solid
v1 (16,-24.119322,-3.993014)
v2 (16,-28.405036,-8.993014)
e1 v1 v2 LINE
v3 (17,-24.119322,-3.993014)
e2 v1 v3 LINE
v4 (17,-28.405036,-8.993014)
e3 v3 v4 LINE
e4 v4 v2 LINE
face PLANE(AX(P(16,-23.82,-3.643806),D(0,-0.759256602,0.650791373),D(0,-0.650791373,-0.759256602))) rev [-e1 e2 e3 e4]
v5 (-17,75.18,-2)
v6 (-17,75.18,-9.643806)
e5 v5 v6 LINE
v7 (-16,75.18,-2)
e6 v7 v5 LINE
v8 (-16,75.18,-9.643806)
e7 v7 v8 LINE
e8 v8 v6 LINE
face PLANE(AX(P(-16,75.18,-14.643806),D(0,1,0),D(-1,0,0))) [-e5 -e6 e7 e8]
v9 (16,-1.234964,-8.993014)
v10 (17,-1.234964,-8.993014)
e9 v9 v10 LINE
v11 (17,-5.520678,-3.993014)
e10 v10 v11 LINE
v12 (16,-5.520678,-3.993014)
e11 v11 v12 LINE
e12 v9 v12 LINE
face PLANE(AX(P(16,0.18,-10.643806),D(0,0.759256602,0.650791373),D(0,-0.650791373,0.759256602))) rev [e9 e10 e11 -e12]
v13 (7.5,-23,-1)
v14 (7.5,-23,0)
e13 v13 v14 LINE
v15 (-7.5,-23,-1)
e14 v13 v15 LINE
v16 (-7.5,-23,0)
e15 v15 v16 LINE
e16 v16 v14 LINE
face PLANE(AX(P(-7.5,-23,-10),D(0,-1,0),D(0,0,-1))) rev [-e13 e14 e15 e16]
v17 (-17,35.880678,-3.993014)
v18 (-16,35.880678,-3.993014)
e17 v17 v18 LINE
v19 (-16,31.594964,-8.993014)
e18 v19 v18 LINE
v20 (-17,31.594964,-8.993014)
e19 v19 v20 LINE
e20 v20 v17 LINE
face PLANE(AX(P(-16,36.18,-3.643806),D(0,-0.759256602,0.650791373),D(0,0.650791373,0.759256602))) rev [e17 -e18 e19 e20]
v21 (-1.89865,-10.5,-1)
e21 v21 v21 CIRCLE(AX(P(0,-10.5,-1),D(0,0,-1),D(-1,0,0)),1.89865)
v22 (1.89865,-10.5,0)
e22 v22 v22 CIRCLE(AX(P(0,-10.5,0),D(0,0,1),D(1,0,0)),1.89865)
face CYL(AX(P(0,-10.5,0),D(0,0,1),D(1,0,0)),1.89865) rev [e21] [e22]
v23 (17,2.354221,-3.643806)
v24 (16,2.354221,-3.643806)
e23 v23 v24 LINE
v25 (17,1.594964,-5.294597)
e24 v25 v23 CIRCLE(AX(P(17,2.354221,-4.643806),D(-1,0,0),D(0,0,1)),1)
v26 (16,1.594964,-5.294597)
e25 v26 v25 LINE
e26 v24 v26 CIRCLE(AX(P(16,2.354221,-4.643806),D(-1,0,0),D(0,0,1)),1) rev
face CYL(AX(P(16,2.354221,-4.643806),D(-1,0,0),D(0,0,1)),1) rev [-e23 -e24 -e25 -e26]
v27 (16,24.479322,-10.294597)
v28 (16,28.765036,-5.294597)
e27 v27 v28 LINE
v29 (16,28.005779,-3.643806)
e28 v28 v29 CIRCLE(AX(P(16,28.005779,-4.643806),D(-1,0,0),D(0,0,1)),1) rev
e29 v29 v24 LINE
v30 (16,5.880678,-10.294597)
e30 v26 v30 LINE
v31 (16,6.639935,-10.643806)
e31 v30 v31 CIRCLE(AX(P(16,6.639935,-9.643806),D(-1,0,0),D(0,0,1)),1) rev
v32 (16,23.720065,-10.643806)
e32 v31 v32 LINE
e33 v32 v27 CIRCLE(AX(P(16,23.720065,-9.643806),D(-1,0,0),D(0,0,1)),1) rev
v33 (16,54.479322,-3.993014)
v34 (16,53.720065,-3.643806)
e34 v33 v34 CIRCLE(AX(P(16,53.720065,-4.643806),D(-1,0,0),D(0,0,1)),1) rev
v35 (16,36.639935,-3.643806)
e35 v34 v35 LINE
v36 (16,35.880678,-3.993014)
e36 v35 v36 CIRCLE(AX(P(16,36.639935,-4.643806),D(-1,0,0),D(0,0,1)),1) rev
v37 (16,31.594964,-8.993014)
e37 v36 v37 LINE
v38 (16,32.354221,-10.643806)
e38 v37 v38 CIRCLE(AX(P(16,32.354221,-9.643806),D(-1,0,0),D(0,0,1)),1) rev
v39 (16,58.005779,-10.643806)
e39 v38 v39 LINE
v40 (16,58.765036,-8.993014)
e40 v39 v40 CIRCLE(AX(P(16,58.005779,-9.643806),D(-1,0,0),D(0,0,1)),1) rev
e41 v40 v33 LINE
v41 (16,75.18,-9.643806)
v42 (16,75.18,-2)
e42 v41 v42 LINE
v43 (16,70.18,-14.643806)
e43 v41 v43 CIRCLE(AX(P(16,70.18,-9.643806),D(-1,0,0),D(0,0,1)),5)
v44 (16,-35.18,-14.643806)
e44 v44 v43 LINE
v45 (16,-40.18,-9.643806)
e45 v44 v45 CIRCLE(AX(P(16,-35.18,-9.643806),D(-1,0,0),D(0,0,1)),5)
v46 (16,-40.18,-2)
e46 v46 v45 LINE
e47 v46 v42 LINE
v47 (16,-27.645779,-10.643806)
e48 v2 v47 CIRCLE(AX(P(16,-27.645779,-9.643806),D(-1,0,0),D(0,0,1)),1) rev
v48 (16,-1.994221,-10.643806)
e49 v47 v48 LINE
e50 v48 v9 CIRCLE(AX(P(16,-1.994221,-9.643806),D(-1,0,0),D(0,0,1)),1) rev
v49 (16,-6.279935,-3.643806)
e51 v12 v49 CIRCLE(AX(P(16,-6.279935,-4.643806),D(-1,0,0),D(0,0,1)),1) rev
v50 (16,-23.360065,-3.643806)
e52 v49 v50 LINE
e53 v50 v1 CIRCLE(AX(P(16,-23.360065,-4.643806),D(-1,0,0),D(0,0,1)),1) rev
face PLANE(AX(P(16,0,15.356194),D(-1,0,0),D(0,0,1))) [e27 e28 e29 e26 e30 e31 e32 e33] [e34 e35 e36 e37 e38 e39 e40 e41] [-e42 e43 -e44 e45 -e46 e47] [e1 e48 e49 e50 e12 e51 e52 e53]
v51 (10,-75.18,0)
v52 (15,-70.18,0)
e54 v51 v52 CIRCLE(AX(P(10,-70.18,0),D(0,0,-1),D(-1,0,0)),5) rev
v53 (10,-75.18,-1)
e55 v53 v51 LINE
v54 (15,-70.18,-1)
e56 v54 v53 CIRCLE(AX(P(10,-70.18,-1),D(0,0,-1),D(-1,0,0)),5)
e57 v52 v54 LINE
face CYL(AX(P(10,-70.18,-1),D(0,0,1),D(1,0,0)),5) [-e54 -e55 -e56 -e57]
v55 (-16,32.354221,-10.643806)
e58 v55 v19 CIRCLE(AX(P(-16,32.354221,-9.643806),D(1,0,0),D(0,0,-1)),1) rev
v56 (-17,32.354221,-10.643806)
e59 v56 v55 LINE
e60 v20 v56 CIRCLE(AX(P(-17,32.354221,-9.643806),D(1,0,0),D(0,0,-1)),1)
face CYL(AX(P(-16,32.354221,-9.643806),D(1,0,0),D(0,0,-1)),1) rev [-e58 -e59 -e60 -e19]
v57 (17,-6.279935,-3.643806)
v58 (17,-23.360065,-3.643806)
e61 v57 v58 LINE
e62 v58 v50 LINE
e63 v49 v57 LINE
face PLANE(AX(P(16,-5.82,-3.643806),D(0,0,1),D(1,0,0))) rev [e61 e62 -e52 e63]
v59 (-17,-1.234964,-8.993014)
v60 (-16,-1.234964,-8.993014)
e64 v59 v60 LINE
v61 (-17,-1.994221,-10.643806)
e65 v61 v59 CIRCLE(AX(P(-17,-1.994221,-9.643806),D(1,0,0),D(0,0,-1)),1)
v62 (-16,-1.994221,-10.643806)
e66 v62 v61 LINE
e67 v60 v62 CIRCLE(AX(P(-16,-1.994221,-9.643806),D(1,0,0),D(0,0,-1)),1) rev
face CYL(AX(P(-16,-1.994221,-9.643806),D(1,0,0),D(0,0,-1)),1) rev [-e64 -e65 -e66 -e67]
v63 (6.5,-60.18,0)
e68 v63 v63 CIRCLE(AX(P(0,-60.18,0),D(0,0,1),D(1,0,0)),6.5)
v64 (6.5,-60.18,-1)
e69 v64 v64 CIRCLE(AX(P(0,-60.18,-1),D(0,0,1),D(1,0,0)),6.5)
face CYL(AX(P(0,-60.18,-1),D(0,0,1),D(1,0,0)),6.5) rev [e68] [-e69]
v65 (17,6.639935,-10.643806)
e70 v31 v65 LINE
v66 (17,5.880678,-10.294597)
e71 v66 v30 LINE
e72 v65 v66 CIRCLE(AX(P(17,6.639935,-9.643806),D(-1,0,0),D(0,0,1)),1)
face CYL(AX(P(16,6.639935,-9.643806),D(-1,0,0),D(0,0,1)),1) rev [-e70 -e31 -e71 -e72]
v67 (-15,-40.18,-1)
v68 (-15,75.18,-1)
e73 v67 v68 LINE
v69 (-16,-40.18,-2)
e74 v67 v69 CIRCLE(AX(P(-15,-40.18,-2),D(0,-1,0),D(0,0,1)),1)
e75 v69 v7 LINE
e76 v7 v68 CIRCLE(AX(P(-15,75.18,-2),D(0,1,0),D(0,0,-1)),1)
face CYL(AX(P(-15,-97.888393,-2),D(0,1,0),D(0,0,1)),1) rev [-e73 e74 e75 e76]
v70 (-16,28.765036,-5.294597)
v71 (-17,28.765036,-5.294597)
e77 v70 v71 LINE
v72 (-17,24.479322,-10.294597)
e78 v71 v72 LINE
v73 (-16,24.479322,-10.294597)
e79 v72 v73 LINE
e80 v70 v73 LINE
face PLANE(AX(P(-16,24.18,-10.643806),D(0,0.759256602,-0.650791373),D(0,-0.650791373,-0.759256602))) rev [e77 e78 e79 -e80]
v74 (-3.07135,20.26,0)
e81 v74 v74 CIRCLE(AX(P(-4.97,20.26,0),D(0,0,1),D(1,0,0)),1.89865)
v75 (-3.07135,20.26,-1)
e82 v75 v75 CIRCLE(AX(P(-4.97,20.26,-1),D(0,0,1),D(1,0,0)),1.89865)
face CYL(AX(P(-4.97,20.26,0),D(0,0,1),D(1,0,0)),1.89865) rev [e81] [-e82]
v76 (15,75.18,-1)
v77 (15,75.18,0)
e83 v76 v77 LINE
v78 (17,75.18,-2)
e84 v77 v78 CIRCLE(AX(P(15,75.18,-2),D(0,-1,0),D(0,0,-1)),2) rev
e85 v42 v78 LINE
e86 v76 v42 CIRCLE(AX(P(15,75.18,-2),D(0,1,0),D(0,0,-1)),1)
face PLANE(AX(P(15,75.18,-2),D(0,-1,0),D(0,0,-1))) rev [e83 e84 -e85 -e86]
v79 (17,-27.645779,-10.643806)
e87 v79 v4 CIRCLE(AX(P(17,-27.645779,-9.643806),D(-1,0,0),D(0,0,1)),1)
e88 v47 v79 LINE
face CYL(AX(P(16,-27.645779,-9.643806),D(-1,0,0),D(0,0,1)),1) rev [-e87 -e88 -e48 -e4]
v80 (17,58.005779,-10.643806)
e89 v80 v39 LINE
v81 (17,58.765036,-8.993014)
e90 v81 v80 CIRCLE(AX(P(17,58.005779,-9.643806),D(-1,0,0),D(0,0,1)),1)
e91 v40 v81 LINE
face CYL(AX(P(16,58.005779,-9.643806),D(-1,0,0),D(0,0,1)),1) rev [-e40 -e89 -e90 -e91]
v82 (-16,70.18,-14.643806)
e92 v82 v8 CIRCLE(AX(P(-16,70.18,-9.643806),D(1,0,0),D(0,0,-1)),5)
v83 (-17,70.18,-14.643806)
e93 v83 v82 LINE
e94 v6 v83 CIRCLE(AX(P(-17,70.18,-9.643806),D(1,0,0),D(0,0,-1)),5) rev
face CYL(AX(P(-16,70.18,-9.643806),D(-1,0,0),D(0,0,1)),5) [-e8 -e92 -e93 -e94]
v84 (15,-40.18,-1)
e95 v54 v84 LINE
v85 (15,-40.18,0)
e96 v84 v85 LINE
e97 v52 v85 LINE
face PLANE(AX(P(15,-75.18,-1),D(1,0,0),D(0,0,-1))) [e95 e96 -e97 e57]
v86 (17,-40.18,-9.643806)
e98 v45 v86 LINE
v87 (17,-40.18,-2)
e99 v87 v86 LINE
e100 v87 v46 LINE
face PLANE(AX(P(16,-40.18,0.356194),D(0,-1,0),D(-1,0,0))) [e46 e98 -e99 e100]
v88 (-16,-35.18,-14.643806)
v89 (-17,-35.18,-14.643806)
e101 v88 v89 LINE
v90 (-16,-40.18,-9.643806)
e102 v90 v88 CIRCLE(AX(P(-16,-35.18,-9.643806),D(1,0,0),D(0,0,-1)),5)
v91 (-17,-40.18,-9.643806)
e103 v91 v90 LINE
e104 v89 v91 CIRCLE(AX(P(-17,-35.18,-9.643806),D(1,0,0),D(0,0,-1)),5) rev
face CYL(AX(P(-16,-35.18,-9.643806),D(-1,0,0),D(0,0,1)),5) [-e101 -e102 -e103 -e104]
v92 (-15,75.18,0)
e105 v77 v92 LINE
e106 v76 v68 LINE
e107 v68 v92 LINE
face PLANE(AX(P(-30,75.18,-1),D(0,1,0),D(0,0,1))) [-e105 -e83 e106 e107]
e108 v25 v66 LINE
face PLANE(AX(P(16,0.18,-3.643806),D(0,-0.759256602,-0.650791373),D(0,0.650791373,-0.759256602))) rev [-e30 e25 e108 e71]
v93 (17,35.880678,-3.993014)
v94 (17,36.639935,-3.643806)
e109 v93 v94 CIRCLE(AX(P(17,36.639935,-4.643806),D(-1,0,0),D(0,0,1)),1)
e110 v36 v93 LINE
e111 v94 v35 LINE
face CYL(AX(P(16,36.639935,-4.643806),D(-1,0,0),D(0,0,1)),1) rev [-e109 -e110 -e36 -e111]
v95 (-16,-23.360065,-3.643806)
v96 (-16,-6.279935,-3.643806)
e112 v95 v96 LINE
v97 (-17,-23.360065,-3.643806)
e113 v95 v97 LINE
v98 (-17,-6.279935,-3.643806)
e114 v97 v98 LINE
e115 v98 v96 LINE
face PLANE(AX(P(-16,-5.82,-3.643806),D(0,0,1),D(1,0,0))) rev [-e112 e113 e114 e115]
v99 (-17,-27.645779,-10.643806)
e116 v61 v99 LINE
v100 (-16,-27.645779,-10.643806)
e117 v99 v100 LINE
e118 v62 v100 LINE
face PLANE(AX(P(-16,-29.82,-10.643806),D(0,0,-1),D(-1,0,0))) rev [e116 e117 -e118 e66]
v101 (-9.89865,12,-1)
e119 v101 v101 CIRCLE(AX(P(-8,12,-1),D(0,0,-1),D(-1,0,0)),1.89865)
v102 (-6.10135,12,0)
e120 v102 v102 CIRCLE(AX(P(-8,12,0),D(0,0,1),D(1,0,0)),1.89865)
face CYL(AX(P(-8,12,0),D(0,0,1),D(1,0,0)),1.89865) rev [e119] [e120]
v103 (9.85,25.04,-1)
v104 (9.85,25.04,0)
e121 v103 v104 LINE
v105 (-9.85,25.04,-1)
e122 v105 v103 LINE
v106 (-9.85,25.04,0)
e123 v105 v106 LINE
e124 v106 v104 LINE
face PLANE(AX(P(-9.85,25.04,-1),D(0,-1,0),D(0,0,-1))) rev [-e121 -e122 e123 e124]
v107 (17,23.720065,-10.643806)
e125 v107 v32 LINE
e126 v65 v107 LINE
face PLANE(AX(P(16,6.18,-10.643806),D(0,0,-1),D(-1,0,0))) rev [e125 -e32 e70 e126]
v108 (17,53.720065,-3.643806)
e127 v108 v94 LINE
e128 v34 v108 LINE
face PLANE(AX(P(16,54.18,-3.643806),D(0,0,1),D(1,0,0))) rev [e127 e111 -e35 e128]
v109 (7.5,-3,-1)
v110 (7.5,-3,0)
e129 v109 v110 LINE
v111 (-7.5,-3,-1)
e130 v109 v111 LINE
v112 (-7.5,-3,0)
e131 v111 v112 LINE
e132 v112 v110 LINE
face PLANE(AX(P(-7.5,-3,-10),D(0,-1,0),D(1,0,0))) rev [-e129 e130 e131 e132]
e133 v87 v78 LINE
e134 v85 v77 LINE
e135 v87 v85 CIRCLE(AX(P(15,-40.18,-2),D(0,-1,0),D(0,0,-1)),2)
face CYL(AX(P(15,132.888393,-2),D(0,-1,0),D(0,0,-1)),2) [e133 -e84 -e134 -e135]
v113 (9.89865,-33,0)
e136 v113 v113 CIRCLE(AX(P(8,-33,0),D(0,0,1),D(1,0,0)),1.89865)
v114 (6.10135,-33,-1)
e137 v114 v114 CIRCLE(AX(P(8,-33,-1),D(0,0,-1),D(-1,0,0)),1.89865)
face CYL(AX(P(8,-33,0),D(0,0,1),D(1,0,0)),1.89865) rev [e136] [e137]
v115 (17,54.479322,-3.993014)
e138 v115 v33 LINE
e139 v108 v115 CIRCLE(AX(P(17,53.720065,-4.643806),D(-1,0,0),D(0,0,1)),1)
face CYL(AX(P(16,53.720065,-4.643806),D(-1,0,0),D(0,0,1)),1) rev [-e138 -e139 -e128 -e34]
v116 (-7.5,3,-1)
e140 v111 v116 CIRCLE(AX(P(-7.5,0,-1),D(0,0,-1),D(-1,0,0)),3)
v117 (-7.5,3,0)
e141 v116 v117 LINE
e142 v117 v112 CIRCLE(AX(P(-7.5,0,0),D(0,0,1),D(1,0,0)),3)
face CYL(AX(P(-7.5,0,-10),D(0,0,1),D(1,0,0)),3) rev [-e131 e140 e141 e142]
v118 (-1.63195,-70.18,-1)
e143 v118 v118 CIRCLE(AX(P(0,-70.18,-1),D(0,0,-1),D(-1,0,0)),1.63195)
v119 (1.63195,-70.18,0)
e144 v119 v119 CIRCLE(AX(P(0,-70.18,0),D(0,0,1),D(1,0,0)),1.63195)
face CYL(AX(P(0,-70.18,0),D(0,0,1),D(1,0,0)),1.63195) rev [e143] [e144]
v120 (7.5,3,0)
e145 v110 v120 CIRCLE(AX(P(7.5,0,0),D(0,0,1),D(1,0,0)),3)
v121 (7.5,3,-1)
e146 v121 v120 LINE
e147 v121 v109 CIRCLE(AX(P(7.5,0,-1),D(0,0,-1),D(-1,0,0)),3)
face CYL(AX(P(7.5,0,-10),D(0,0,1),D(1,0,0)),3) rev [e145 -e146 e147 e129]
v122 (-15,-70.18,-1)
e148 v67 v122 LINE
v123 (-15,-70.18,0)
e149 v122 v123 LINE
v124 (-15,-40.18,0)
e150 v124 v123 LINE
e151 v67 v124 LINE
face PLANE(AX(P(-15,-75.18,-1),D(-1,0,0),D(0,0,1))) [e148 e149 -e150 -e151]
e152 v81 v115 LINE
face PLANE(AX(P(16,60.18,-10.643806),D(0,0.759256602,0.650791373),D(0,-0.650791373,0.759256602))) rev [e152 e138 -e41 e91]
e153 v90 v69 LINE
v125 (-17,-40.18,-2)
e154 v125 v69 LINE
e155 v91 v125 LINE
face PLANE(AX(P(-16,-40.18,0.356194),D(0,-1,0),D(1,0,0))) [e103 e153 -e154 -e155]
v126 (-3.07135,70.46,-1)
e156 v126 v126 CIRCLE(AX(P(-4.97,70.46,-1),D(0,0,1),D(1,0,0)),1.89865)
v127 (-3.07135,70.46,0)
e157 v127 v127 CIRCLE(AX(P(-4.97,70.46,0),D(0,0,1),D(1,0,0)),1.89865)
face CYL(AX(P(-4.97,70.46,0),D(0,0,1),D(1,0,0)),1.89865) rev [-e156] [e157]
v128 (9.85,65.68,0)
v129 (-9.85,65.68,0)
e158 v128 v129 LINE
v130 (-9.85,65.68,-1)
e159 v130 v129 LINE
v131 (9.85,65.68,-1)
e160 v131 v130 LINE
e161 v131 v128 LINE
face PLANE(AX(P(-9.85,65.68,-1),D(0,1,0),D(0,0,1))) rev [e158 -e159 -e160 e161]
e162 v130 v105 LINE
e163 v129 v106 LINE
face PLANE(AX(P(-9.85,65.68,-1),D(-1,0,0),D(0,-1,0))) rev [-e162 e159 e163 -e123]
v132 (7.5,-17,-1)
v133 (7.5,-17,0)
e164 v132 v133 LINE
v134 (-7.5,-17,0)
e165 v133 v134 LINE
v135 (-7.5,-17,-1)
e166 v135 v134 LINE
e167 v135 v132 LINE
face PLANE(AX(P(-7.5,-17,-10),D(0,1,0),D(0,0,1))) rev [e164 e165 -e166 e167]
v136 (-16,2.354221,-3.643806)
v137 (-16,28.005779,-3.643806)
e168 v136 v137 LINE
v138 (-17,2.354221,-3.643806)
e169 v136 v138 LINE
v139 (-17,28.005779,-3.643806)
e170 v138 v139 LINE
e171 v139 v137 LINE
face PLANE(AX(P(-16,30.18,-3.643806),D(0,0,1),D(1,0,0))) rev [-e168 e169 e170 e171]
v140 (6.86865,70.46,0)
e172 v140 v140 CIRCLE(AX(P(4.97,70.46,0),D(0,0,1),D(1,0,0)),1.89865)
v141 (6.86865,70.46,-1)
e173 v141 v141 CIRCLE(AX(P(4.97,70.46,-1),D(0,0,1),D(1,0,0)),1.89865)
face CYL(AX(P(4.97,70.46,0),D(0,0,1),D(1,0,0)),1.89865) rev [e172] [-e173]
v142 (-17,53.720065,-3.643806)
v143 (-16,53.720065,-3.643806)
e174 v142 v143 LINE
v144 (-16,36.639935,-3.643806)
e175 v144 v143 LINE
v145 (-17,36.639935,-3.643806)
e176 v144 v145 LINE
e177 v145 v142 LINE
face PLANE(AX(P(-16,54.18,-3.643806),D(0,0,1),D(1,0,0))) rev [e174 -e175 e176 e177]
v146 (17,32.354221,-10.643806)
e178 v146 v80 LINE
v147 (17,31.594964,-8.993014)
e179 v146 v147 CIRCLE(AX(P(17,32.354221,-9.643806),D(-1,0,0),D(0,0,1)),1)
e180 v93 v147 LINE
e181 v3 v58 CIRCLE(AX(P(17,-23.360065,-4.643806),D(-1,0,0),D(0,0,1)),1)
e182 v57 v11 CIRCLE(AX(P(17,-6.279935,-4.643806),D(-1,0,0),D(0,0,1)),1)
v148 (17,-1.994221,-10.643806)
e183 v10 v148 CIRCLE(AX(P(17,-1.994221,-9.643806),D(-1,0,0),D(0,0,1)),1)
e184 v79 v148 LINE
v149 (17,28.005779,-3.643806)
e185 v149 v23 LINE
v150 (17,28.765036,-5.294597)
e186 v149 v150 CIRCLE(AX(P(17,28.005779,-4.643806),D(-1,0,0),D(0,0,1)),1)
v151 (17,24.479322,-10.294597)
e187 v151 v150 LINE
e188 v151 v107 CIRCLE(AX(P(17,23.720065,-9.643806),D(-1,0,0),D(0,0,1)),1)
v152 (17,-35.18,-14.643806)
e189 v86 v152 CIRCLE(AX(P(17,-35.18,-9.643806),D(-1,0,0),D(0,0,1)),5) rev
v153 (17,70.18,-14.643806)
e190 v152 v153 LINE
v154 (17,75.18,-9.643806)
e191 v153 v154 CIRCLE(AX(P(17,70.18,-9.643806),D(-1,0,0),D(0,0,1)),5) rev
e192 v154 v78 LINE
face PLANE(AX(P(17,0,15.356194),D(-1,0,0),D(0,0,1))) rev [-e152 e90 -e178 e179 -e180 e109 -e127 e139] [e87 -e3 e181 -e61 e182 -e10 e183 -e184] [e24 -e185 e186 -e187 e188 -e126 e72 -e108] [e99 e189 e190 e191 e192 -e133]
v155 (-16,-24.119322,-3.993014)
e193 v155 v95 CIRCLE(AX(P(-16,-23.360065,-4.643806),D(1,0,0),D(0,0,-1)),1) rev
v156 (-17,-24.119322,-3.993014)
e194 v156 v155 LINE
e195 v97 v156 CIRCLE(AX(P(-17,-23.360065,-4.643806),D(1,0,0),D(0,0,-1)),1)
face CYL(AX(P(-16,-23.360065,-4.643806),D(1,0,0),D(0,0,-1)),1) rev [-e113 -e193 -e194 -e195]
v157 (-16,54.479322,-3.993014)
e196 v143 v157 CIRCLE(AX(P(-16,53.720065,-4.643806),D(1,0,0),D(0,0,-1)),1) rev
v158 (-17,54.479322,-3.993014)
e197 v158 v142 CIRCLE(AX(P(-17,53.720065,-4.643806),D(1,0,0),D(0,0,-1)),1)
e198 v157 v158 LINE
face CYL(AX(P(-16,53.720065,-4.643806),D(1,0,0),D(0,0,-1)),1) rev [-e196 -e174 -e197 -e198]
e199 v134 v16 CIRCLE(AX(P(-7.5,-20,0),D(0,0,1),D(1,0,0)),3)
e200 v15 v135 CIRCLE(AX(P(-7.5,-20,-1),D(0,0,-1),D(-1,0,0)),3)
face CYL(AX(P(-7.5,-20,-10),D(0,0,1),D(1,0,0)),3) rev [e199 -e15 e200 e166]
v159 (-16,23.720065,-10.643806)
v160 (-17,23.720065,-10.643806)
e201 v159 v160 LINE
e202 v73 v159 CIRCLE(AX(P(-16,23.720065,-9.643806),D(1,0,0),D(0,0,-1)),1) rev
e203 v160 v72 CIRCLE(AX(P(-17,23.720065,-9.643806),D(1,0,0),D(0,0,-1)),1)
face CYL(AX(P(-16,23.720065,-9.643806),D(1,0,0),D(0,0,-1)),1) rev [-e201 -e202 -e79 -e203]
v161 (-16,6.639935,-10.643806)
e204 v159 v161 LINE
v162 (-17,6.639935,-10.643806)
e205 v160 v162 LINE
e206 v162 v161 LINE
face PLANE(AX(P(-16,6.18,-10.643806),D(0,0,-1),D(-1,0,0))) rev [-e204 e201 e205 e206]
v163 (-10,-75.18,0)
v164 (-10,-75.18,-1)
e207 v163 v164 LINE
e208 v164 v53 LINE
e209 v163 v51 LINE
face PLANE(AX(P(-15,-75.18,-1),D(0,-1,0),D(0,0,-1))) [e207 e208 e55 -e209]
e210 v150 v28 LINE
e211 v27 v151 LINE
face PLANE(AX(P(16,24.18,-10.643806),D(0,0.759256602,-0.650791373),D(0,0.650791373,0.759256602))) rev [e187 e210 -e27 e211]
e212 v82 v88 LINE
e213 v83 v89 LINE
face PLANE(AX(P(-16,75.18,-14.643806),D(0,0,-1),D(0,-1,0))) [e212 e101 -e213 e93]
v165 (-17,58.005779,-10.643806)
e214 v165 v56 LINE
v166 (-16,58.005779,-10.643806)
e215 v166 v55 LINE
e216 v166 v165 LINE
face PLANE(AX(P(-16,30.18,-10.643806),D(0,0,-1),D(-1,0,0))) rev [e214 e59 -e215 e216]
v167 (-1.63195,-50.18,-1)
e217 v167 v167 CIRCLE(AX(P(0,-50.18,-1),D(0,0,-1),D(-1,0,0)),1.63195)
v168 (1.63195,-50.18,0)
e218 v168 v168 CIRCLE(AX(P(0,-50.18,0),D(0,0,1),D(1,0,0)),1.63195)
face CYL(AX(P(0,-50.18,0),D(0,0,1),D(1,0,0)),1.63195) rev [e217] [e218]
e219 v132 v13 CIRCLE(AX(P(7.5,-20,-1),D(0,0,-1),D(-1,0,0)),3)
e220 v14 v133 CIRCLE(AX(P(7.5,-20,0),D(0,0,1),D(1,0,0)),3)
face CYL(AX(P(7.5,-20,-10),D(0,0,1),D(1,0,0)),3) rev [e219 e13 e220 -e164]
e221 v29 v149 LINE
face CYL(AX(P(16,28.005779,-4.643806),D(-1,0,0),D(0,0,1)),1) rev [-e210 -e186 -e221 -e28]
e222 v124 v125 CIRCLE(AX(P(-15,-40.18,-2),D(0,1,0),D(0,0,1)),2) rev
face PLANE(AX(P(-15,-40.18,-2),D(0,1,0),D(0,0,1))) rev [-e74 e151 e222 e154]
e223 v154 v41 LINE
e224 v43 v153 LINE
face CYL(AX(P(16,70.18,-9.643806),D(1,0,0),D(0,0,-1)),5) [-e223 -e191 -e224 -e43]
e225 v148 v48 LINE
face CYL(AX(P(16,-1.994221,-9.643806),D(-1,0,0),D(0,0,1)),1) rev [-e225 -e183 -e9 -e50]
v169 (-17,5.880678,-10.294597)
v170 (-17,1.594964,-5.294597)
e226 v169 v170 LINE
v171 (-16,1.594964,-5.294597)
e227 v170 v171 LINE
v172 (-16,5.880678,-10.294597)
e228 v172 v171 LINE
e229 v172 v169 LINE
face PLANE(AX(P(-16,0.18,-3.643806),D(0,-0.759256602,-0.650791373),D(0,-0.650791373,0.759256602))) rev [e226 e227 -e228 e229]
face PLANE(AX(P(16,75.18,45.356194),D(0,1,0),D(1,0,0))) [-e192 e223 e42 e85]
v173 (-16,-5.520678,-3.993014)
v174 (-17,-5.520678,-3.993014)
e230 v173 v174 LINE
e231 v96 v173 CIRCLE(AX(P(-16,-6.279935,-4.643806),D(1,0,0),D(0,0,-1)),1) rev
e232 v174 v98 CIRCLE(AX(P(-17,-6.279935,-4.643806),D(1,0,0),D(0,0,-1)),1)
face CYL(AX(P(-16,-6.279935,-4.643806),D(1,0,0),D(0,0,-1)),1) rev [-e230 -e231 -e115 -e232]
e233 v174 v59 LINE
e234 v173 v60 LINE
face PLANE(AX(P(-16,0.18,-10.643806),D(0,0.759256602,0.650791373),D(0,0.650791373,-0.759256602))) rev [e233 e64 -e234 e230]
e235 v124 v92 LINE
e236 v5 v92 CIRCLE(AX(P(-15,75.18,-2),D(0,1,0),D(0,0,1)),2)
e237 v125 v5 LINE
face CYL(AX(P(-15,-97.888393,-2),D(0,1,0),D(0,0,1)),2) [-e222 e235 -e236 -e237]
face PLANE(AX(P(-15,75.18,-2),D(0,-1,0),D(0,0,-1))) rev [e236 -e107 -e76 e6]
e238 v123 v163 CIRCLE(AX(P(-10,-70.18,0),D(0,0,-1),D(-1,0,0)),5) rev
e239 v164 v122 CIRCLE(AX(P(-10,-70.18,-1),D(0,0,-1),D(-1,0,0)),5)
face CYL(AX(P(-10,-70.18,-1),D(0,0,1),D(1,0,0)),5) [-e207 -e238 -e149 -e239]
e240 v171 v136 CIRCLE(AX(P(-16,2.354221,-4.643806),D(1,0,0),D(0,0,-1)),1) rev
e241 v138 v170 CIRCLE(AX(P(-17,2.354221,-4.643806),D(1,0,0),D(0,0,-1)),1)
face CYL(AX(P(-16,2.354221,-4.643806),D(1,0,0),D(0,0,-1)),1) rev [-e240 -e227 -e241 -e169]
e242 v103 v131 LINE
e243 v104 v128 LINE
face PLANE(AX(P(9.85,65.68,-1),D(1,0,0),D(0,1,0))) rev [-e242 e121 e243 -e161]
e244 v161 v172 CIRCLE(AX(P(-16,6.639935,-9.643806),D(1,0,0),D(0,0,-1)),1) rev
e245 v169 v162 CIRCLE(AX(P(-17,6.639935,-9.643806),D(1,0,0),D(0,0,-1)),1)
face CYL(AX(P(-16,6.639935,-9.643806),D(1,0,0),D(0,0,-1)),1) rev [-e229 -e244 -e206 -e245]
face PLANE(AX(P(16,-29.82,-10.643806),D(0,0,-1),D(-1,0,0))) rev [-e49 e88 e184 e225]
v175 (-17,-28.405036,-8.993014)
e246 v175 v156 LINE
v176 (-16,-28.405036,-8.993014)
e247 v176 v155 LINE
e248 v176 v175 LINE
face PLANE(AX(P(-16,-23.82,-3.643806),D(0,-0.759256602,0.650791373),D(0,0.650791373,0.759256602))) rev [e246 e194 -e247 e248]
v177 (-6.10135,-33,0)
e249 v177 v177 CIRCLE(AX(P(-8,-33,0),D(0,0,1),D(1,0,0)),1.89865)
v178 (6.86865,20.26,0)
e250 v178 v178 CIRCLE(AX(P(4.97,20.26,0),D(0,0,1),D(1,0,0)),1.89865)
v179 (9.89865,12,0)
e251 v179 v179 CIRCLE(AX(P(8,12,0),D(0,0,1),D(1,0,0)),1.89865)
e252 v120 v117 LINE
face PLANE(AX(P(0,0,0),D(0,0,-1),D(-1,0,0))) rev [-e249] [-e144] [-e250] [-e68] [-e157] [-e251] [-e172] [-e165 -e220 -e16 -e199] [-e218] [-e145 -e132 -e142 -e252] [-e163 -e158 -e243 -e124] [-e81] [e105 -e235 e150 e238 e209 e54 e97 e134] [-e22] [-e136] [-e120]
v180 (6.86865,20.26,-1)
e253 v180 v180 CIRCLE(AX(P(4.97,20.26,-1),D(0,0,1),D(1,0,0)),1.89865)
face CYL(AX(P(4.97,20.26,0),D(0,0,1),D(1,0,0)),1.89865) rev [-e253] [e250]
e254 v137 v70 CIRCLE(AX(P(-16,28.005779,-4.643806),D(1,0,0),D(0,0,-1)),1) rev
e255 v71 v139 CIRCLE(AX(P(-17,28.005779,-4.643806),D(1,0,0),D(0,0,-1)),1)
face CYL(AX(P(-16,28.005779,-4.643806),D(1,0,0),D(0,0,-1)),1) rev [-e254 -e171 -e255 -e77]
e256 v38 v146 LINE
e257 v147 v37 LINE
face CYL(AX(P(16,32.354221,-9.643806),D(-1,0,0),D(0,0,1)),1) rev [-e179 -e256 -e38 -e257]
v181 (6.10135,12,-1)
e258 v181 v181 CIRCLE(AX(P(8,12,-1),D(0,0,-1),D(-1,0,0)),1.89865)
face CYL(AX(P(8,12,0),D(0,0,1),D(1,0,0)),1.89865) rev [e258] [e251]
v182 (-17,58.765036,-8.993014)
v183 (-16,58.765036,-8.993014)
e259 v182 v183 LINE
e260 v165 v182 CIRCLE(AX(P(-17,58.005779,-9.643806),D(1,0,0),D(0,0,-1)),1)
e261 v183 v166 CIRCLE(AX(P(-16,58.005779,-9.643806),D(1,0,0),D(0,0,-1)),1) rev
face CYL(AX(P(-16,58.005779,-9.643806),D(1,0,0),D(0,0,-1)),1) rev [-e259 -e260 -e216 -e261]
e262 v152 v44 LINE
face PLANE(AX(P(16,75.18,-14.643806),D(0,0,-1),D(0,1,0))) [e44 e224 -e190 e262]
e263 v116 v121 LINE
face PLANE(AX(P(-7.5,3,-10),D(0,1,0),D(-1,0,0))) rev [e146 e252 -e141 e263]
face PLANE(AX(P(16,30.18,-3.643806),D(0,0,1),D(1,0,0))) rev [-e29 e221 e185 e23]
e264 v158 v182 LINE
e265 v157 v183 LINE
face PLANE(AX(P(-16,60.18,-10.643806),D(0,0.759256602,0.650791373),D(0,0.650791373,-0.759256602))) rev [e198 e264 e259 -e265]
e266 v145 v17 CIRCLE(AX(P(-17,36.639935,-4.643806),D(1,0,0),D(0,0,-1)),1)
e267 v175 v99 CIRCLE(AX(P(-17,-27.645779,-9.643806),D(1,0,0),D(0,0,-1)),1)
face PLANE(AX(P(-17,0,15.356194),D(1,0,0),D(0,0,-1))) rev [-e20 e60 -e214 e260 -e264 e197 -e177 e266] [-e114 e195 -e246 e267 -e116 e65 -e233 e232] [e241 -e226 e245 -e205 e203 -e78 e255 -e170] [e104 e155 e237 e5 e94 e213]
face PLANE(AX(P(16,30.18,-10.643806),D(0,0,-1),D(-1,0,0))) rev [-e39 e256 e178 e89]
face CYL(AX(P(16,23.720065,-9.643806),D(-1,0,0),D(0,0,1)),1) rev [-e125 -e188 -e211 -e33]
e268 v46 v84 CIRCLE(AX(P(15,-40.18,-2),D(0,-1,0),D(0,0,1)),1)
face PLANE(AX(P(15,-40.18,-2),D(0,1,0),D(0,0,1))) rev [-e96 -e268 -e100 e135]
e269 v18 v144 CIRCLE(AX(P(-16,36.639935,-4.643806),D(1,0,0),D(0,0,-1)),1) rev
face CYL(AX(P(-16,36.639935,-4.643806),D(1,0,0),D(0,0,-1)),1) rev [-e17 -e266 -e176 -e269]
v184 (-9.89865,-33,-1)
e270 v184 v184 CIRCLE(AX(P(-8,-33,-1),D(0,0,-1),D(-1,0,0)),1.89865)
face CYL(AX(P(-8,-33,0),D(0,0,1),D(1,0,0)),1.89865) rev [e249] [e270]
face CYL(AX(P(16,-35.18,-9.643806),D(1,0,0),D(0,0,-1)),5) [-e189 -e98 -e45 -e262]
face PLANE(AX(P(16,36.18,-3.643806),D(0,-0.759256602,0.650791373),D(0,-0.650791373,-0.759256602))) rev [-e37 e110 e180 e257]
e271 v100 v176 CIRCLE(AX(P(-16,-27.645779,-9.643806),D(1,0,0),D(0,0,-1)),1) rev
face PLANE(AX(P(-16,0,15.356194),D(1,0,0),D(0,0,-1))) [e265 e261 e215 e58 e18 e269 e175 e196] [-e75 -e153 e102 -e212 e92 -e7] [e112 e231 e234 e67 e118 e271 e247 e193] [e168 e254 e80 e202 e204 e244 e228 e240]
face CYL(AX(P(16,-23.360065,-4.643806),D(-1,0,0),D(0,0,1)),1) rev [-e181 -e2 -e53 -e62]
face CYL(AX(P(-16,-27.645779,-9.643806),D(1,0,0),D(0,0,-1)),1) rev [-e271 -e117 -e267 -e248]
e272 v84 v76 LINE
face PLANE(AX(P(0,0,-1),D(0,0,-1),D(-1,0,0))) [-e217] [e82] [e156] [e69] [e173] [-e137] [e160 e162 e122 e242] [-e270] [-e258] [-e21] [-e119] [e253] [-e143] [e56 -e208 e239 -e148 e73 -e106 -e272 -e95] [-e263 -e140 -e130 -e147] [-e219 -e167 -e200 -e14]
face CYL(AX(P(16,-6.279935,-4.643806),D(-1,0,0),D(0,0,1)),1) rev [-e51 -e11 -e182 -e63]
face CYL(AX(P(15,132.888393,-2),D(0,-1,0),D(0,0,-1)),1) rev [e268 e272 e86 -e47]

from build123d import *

# Parameters (mm, degrees)
SKETCH1_R                  = 6.5
SKETCH1_W                  = 19.7
SKETCH1_H                  = 40.64
BASE_FLANGE1_DEPTH         = 1
FILLET1_R                  = 5
F_6_CLEARANCE_HOLE1_D      = 3.7973
SKETCHED_START             = 16.78876
SKETCHED_BEND1_OUTLINE_W   = 115.36
SKETCHED_BEND1_OUTLINE_H   = 1
SKETCHED_BEND1_DEPTH       = 13.21124
SKETCHED_START_2           = -30
SKETCHED_BEND1_2_OUTLINE_W = 115.36
SKETCHED_BEND1_2_OUTLINE_H = 1
SKETCHED_BEND1_2_DEPTH     = 13.18876
SKETCHED_START_3           = -17
SKETCHED_BEND1_3_DEPTH     = 2
SKETCHED_START_4           = 15
SKETCHED_BEND1_4_DEPTH     = 2
SKETCHED_START_5           = -40.18
SKETCHED_BEND1_5_DEPTH     = 115.36
F_4_CLEARANCE_HOLE1_D      = 3.2639
FILLET2_R                  = 1
F_6_CLEARANCE_HOLE2_D      = 3.7973
CUT_EXTRUDE1_DEPTH         = 10


with BuildPart() as part:
    # Base-Flange1: sheet metal written as solids
    # Sketch1 → Base-Flange1 (new body)
    with BuildSketch(Plane.XY):
        Polygon((-30, 75.18), (30, 75.18), (30, -40.18), (15, -40.18), (15, -75.18), (-15, -75.18), (-15, -40.18), (-30, -40.18), align=None)
        with Locations((0, -60.18)):
            Circle(SKETCH1_R, mode=Mode.SUBTRACT)
        Polygon((-26, 60.18), (-19, 54.18), (-19, 36.18), (-26, 30.18), align=None, mode=Mode.SUBTRACT)
        with Locations((0, 45.36)):
            Rectangle(SKETCH1_W, SKETCH1_H, mode=Mode.SUBTRACT)
        Polygon((-26, 24.18), (-19, 30.18), (-19, 0.18), (-26, 6.18), align=None, mode=Mode.SUBTRACT)
        Polygon((-26, -29.82), (-26, 0.18), (-19, -5.82), (-19, -23.82), align=None, mode=Mode.SUBTRACT)
        Polygon((19, -23.82), (26, -29.82), (26, 0.18), (19, -5.82), align=None, mode=Mode.SUBTRACT)
        Polygon((19, 0.18), (26, 6.18), (26, 24.18), (19, 30.18), align=None, mode=Mode.SUBTRACT)
        Polygon((19, 36.18), (26, 30.18), (26, 60.18), (19, 54.18), align=None, mode=Mode.SUBTRACT)
    extrude(amount=-BASE_FLANGE1_DEPTH)

    # Fillet1
    fillet1_edges = [part.edges().sort_by_distance(p)[0] for p in [
        (-30, 75.18, -0.5),
        (30, 75.18, -0.5),
        (30, -40.18, -0.5),
        (15, -75.18, -0.5),
        (-15, -75.18, -0.5),
        (-30, -40.18, -0.5),
    ]]
    fillet(fillet1_edges, radius=FILLET1_R)

    # #6 Clearance Hole1 (through all)
    with Locations(Plane.XY):
        with Locations((-4.97, 70.46), (4.97, 70.46), (-4.97, 20.26), (4.97, 20.26)):
            Hole(F_6_CLEARANCE_HOLE1_D / 2)

    # Sketched Bend1: read off the stored shape, not the designer's step
    # Sketched Bend1 outline → Sketched Bend1 (cut)
    with BuildSketch(Plane.YZ.offset(SKETCHED_START)):
        with Locations((17.5, -0.5)):
            Rectangle(SKETCHED_BEND1_OUTLINE_W, SKETCHED_BEND1_OUTLINE_H)
    extrude(amount=SKETCHED_BEND1_DEPTH, mode=Mode.SUBTRACT)

    # Sketched Bend1 2 outline → Sketched Bend1 2 (cut)
    with BuildSketch(Plane.YZ.offset(SKETCHED_START_2)):
        with Locations((17.5, -0.5)):
            Rectangle(SKETCHED_BEND1_2_OUTLINE_W, SKETCHED_BEND1_2_OUTLINE_H)
    extrude(amount=SKETCHED_BEND1_2_DEPTH, mode=Mode.SUBTRACT)

    # Sketched Bend1 3 outline → Sketched Bend1 3 (add)
    with BuildSketch(Plane.YZ.offset(SKETCHED_START_3)):
        with BuildLine():
            Line((75.18, -9.64380551), (75.18, -1))
            Line((75.18, -1), (-40.18, -1))
            Line((-40.18, -1), (-40.18, -9.64380551))
            ThreePointArc((-40.18, -9.64380551), (-38.715533906, -13.179339416), (-35.18, -14.64380551))
            Line((-35.18, -14.64380551), (70.18, -14.64380551))
            ThreePointArc((70.18, -14.64380551), (73.715533906, -13.179339416), (75.18, -9.64380551))
        make_face()
        Polygon((-23.82, -3.64380551), (-5.82, -3.64380551), (0.18, -10.64380551), (-29.82, -10.64380551), align=None, mode=Mode.SUBTRACT)
        Polygon((0.18, -3.64380551), (30.18, -3.64380551), (24.18, -10.64380551), (6.18, -10.64380551), align=None, mode=Mode.SUBTRACT)
        Polygon((54.18, -3.64380551), (60.18, -10.64380551), (30.18, -10.64380551), (36.18, -3.64380551), align=None, mode=Mode.SUBTRACT)
    extrude(amount=SKETCHED_BEND1_3_DEPTH)

    # Sketched Bend1 4 outline → Sketched Bend1 4 (add)
    with BuildSketch(Plane.YZ.offset(SKETCHED_START_4)):
        with BuildLine():
            Line((75.18, -9.64380551), (75.18, -1))
            Line((75.18, -1), (-40.18, -1))
            Line((-40.18, -1), (-40.18, -9.64380551))
            ThreePointArc((-40.18, -9.64380551), (-38.715533906, -13.179339416), (-35.18, -14.64380551))
            Line((-35.18, -14.64380551), (70.18, -14.64380551))
            ThreePointArc((70.18, -14.64380551), (73.715533906, -13.179339416), (75.18, -9.64380551))
        make_face()
        Polygon((-23.82, -3.64380551), (-5.82, -3.64380551), (0.18, -10.64380551), (-29.82, -10.64380551), align=None, mode=Mode.SUBTRACT)
        Polygon((0.18, -3.64380551), (30.18, -3.64380551), (24.18, -10.64380551), (6.18, -10.64380551), align=None, mode=Mode.SUBTRACT)
        Polygon((54.18, -3.64380551), (60.18, -10.64380551), (30.18, -10.64380551), (36.18, -3.64380551), align=None, mode=Mode.SUBTRACT)
    extrude(amount=SKETCHED_BEND1_4_DEPTH)

    # Sketched Bend1 5 outline → Sketched Bend1 5 (cut)
    with BuildSketch(Plane(origin=(0, 0, 0), x_dir=(1, 0, 0), z_dir=(0, 1, 0)).offset(SKETCHED_START_5)):
        with BuildLine():
            ThreePointArc((-16, 2), (-15.707106781, 1.292893219), (-15, 1))
            Line((-15, 1), (-15, 14.64380551))
            Line((-15, 14.64380551), (-16, 14.64380551))
            Line((-16, 14.64380551), (-16, 2))
        make_face()
        with BuildLine():
            ThreePointArc((17, 2), (16.414213562, 0.585786438), (15, 0))
            Line((15, 0), (16.78876, 0))
            Line((16.78876, 0), (16.78876, 1))
            Line((16.78876, 1), (17, 1))
            Line((17, 1), (17, 2))
        make_face()
        with BuildLine():
            ThreePointArc((-15, 0), (-16.414213562, 0.585786438), (-17, 2))
            Line((-17, 2), (-17, 1))
            Line((-17, 1), (-16.81124, 1))
            Line((-16.81124, 1), (-16.81124, 0))
            Line((-16.81124, 0), (-15, 0))
        make_face()
        with BuildLine():
            ThreePointArc((15, 1), (15.707106781, 1.292893219), (16, 2))
            Line((16, 2), (16, 14.64380551))
            Line((16, 14.64380551), (15, 14.64380551))
            Line((15, 14.64380551), (15, 1))
        make_face()
    extrude(amount=SKETCHED_BEND1_5_DEPTH, mode=Mode.SUBTRACT)

    # #4 Clearance Hole1 (through all)
    with Locations(Plane.XY):
        with Locations((0, -50.18), (0, -70.18)):
            Hole(F_4_CLEARANCE_HOLE1_D / 2)

    # Fillet2
    fillet2_edges = [part.edges().sort_by_distance(p)[0] for p in [
        (-16.5, 54.18, -3.64380551),
        (-16.5, 36.18, -3.64380551),
        (-16.5, 30.18, -10.64380551),
        (-16.5, 60.18, -10.64380551),
        (-16.5, 24.18, -10.64380551),
        (-16.5, 30.18, -3.64380551),
        (-16.5, 0.18, -3.64380551),
        (-16.5, 6.18, -10.64380551),
        (-16.5, -23.82, -3.64380551),
        (-16.5, -29.82, -10.64380551),
        (-16.5, 0.18, -10.64380551),
        (-16.5, -5.82, -3.64380551),
        (16.5, 0.18, -10.64380551),
        (16.5, -29.82, -10.64380551),
        (16.5, -23.82, -3.64380551),
        (16.5, -5.82, -3.64380551),
        (16.5, 24.18, -10.64380551),
        (16.5, 6.18, -10.64380551),
        (16.5, 0.18, -3.64380551),
        (16.5, 30.18, -3.64380551),
        (16.5, 60.18, -10.64380551),
        (16.5, 30.18, -10.64380551),
        (16.5, 36.18, -3.64380551),
        (16.5, 54.18, -3.64380551),
    ]]
    fillet(fillet2_edges, radius=FILLET2_R)

    # #6 Clearance Hole2 (through all)
    with Locations(Plane.XY):
        with Locations((-8, 12), (8, 12), (0, -10.5), (-8, -33), (8, -33)):
            Hole(F_6_CLEARANCE_HOLE2_D / 2)

    # Sketch13 → Cut-Extrude1 (cut)
    with BuildSketch(Plane.XY):
        with BuildLine():
            Line((-7.5, 3), (7.5, 3))
            ThreePointArc((7.5, 3), (10.5, 0), (7.5, -3))
            Line((7.5, -3), (-7.5, -3))
            ThreePointArc((-7.5, -3), (-10.5, 0), (-7.5, 3))
        make_face()
        with BuildLine():
            Line((-7.5, -17), (7.5, -17))
            ThreePointArc((7.5, -17), (10.5, -20), (7.5, -23))
            Line((7.5, -23), (-7.5, -23))
            ThreePointArc((-7.5, -23), (-10.5, -20), (-7.5, -17))
        make_face()
    extrude(amount=-CUT_EXTRUDE1_DEPTH, mode=Mode.SUBTRACT)


solid = part.part
